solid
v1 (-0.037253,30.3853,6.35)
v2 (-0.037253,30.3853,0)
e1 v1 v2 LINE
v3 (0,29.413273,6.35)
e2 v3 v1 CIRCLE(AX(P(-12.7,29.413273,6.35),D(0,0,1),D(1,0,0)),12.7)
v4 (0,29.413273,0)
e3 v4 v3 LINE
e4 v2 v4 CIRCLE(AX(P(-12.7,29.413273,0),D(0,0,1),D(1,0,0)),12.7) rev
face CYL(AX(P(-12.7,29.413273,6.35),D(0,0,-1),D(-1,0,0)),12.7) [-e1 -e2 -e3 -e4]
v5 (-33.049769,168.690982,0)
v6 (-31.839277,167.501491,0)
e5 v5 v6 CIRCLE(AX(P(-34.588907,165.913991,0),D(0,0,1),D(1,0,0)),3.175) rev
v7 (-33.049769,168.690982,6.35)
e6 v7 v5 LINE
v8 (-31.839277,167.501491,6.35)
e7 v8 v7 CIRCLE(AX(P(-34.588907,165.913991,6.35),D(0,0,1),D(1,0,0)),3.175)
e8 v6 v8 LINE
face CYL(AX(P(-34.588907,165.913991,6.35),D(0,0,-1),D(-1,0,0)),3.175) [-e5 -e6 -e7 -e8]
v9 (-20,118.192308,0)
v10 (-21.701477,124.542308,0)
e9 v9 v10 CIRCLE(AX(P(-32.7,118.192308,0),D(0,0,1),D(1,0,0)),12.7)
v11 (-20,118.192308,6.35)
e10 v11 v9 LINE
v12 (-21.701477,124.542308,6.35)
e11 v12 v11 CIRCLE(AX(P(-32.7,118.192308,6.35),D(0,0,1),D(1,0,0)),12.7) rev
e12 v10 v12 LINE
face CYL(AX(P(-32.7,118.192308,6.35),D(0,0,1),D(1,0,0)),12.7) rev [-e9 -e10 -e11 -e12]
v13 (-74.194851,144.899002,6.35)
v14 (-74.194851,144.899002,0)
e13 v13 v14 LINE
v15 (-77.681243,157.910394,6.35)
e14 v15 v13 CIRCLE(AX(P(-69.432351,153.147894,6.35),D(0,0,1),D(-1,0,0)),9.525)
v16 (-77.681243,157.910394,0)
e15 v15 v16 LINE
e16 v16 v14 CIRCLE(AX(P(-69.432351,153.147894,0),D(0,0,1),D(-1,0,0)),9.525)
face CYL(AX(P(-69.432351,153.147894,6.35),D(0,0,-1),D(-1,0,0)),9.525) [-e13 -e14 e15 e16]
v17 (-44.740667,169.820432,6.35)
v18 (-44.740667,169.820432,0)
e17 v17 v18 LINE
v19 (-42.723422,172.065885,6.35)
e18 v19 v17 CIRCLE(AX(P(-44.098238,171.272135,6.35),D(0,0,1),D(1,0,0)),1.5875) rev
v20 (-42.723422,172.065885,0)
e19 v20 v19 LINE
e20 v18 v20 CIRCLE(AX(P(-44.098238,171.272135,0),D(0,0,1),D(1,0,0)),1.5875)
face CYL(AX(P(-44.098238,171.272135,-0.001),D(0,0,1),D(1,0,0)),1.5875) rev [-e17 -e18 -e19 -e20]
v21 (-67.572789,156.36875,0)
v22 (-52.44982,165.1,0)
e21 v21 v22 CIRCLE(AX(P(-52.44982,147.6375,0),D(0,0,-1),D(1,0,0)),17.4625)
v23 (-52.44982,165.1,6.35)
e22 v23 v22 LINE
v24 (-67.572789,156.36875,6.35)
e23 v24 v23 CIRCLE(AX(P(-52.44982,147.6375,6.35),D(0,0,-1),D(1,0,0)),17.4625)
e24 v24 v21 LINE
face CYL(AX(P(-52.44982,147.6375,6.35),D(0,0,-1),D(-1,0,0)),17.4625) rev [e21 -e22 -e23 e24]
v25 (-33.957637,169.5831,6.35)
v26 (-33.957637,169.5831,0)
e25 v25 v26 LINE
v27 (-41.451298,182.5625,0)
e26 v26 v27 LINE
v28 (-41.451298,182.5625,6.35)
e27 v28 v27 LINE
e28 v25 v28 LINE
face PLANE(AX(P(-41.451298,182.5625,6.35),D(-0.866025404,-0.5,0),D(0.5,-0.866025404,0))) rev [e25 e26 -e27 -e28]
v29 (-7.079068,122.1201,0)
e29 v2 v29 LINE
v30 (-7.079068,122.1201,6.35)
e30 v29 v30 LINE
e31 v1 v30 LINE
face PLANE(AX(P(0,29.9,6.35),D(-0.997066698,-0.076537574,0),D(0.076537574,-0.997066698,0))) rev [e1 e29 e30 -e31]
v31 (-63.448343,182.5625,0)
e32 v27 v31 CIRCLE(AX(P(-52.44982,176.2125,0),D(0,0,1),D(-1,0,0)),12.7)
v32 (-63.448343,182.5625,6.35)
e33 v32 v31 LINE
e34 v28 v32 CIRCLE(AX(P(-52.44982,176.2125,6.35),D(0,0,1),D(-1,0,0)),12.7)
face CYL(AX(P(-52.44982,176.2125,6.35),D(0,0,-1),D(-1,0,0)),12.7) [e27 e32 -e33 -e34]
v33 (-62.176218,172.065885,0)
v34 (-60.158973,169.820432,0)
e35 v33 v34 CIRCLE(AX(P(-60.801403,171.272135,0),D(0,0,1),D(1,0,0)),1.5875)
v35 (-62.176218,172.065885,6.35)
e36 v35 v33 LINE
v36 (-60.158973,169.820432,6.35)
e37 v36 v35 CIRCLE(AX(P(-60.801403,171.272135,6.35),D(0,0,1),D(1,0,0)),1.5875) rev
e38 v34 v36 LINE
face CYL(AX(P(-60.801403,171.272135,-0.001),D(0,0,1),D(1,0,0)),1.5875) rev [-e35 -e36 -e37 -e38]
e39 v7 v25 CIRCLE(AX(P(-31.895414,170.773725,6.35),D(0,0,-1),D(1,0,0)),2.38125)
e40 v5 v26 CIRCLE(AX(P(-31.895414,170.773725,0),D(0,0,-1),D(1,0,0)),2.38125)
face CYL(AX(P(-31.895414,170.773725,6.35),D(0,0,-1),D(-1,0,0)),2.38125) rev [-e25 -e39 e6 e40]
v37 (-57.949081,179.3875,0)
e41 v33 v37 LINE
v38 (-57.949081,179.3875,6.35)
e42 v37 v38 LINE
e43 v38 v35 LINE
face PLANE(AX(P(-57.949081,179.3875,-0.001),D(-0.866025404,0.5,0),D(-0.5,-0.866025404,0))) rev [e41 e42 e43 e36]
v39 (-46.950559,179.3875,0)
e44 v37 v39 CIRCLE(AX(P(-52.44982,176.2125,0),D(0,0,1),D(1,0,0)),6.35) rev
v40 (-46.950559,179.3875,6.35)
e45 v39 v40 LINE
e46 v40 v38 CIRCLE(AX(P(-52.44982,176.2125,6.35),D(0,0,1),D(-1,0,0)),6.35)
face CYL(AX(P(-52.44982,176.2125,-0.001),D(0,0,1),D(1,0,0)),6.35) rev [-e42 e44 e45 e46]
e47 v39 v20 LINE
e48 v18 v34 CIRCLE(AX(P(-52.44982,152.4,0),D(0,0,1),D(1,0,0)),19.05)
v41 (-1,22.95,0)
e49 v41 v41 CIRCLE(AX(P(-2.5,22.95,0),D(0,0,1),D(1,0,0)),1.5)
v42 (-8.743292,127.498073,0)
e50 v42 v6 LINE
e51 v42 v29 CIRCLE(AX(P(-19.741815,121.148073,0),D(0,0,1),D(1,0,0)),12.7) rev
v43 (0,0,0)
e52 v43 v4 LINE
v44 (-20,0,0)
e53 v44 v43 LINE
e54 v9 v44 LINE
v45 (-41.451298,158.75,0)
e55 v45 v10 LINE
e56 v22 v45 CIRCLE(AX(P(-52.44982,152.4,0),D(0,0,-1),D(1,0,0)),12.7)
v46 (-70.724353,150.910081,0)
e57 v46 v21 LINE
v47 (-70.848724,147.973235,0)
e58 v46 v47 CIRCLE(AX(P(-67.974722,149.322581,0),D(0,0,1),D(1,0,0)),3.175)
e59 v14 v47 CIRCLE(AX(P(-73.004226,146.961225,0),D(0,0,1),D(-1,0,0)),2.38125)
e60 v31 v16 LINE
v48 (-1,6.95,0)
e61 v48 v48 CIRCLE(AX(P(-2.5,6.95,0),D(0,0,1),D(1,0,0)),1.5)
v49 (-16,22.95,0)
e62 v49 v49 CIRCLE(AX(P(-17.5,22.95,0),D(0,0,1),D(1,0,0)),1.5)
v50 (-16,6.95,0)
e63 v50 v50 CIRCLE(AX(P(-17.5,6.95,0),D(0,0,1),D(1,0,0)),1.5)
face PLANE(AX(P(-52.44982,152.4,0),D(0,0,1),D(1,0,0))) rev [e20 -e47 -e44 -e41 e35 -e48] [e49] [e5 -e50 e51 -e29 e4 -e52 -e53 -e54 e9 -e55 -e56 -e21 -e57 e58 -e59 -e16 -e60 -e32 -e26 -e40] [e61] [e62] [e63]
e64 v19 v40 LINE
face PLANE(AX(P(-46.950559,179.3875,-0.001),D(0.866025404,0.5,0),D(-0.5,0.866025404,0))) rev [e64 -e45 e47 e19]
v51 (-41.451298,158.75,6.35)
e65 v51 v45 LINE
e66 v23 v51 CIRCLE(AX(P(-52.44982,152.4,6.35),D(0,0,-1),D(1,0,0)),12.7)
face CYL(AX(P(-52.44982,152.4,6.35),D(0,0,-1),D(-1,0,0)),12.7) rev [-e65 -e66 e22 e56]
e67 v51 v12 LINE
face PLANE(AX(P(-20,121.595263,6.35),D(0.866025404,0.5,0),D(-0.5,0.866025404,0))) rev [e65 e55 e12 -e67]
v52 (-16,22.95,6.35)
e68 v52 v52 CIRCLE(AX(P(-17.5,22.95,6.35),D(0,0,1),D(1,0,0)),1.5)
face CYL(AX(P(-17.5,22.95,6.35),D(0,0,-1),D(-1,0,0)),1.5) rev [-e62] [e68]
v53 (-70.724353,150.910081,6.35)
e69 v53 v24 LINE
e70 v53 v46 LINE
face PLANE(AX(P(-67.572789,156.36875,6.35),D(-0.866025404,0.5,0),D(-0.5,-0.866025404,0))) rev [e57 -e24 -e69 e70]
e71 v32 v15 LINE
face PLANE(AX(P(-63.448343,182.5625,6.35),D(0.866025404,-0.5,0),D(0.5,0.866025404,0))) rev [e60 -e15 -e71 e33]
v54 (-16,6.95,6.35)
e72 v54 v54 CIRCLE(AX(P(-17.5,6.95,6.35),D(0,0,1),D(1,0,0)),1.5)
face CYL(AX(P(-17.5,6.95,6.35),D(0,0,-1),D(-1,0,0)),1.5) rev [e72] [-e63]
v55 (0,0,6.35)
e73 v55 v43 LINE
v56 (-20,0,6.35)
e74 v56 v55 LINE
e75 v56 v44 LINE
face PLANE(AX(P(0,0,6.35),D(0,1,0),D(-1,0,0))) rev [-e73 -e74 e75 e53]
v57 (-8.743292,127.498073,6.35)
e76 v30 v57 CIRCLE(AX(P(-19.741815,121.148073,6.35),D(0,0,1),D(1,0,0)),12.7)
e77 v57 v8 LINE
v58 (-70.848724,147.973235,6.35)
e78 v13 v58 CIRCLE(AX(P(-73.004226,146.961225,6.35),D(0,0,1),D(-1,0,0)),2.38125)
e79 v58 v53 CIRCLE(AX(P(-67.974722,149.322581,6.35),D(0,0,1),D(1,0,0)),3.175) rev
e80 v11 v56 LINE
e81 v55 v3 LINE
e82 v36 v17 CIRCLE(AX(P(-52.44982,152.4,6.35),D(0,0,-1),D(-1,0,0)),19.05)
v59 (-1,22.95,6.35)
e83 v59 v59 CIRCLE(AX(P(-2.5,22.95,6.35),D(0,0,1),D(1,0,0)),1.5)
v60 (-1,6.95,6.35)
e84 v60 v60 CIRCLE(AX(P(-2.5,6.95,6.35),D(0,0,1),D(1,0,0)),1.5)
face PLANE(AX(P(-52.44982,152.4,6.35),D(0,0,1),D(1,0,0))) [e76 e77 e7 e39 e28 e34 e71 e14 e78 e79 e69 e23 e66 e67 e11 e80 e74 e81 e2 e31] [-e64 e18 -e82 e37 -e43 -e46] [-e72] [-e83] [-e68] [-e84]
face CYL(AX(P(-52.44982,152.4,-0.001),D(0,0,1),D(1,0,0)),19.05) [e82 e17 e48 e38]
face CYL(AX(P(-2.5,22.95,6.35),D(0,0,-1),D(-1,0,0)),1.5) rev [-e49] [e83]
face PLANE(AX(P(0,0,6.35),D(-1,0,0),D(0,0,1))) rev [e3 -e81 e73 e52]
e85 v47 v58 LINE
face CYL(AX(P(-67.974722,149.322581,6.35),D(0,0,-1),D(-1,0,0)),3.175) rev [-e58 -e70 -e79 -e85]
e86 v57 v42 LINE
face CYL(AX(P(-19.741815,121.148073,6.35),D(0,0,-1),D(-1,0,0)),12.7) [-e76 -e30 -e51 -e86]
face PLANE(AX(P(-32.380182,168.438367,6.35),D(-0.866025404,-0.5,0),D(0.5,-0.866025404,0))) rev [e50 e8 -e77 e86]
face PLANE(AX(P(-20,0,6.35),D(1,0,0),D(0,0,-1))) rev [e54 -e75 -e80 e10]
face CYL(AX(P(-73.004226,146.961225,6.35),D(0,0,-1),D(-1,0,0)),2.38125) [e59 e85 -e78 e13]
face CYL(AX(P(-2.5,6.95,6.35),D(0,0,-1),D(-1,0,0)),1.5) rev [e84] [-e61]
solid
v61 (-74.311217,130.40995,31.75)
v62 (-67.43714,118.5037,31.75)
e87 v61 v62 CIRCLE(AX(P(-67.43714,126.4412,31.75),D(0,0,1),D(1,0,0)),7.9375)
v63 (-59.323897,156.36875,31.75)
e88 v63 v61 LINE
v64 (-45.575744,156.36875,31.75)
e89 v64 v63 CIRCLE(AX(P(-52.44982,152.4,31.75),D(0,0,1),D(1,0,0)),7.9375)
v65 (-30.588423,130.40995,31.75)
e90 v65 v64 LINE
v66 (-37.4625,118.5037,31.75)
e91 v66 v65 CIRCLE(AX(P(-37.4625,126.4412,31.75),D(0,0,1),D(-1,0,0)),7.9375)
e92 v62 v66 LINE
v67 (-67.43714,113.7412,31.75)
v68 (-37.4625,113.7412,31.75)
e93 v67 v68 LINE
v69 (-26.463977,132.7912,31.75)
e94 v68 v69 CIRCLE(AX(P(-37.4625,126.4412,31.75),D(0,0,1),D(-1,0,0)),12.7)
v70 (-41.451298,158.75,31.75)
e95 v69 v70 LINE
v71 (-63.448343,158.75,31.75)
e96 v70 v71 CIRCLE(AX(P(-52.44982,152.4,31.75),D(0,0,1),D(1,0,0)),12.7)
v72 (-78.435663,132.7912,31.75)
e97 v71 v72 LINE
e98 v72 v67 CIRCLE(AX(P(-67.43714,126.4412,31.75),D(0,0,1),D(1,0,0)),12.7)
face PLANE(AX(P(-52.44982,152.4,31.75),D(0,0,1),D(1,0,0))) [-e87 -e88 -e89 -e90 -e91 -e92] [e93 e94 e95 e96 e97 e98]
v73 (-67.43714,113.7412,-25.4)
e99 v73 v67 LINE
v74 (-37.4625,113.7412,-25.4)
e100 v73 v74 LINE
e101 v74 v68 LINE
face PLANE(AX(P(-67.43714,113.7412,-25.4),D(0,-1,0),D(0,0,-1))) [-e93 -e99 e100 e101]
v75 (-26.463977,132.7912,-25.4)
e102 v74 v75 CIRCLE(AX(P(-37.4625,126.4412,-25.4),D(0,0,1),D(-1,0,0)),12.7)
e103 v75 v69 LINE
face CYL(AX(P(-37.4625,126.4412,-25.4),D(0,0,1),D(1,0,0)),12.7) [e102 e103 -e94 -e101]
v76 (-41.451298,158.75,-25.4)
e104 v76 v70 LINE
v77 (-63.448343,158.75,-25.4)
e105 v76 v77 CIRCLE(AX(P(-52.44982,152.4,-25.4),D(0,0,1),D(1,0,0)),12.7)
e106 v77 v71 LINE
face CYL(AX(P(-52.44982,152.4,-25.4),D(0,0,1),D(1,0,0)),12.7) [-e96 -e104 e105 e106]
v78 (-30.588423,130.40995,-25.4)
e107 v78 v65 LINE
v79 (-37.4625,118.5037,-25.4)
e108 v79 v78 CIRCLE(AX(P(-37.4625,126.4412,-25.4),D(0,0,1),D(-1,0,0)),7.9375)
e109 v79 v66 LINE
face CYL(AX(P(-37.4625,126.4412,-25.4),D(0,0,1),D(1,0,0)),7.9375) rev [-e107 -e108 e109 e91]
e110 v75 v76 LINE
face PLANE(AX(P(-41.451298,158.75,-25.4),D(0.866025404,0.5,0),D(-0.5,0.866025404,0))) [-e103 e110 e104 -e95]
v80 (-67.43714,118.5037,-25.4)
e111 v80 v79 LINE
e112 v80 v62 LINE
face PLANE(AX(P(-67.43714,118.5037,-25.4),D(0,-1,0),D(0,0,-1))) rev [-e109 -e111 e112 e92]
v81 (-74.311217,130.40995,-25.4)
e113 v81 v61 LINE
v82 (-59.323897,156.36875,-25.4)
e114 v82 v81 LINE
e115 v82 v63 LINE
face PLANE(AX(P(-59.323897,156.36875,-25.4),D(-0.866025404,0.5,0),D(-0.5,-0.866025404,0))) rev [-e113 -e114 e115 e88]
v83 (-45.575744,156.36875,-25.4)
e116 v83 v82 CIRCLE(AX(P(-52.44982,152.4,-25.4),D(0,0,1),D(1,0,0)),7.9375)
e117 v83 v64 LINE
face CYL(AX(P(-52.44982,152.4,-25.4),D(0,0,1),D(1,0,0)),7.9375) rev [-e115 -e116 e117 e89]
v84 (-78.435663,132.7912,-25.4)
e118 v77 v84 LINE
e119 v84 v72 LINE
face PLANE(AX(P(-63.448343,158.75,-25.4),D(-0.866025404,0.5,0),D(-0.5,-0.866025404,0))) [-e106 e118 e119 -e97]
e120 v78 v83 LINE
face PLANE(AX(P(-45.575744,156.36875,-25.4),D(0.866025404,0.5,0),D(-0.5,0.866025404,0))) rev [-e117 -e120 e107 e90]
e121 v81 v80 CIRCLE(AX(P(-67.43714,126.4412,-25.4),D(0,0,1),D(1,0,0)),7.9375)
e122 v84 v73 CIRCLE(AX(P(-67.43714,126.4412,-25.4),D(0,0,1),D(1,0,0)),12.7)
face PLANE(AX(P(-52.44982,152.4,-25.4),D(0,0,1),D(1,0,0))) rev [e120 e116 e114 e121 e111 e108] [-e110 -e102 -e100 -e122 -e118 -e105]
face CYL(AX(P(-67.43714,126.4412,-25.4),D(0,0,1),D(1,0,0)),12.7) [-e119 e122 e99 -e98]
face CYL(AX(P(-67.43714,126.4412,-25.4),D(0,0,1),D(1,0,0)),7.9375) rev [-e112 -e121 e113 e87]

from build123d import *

# Parameters (mm, degrees)
SKETCH1_R                = 1.5
BOSS_EXTRUDE1_DEPTH      = 6.35
FILLET1_R                = 3.175
FILLET2_R                = 12.7
CUT_EXTRUDE1_REACH       = 206.848
FILLET3_R                = 1.5875
BOSS_EXTRUDE2_DEPTH      = 25.4
BOSS_EXTRUDE2_DEPTH_BACK = 31.75


with BuildPart() as part:
    # Sketch1 → Boss-Extrude1 (new body)
    with BuildSketch(Plane.XY):
        with BuildLine():
            Line((0, 0), (0, 29.9))
            Line((0, 29.9), (-7.3, 124.998217517))
            Line((-7.3, 124.998217517), (-32.380181769, 168.438366604))
            Line((-32.380181769, 168.438366604), (-32.511727314, 168.473614126))
            ThreePointArc((-32.511727314, 168.473614126), (-33.345027616, 168.884552358), (-33.957637456, 169.5831))
            Line((-33.957637456, 169.5831), (-41.45129754, 182.5625))
            ThreePointArc((-41.45129754, 182.5625), (-52.449820168, 188.9125), (-63.448342796, 182.5625))
            Line((-63.448342796, 182.5625), (-77.681242844, 157.910393978))
            ThreePointArc((-77.681242844, 157.910393978), (-78.632794368, 150.682642574), (-74.194850873, 144.899002007))
            ThreePointArc((-74.194850873, 144.899002007), (-70.94200288, 145.7706), (-71.813600873, 149.023447993))
            Line((-71.813600873, 149.023447993), (-67.572788781, 156.36875))
            ThreePointArc((-67.572788781, 156.36875), (-61.181070168, 162.760468614), (-52.449820168, 165.1))
            ThreePointArc((-52.449820168, 165.1), (-46.099820168, 163.398522628), (-41.45129754, 158.75))
            Line((-41.45129754, 158.75), (-20, 121.595262773))
            Line((-20, 121.595262773), (-20, 0))
            Line((-20, 0), (0, 0))
        make_face()
        with Locations((-2.5, 22.95)):
            Circle(SKETCH1_R, mode=Mode.SUBTRACT)
        with Locations((-2.5, 6.95)):
            Circle(SKETCH1_R, mode=Mode.SUBTRACT)
        with Locations((-17.5, 6.95)):
            Circle(SKETCH1_R, mode=Mode.SUBTRACT)
        with Locations((-17.5, 22.95)):
            Circle(SKETCH1_R, mode=Mode.SUBTRACT)
    extrude(amount=BOSS_EXTRUDE1_DEPTH)

    # Fillet1
    fillet1_edges = [part.edges().sort_by_distance(p)[0] for p in [
        (-32.380181769, 168.438366604, 3.175),
        (-71.813600873, 149.023447993, 3.175),
    ]]
    fillet(fillet1_edges, radius=FILLET1_R)

    # Fillet2
    # the kernel refuses this fillet: 12.7 mm, written as the material it adds along each edge
    with BuildSketch(Plane(origin=(-20, 121.595262773, 0), x_dir=(0, -1, 0), z_dir=(0, 0, 1))) as fillet2_piece_1:
        with BuildLine():
            CenterArc((FILLET2_R * 0.267949192431, -FILLET2_R), FILLET2_R, 90, 30)
            Line((-FILLET2_R * 0.232050807569, -FILLET2_R * 0.133974596216), (0, 0))
            Line((0, 0), (FILLET2_R * 0.267949192431, 0))
        make_face()
    extrude(amount=6.35)
    # the kernel refuses this fillet: 12.7 mm, written as the material it takes off along each edge
    with BuildSketch(Plane(origin=(-7.3, 124.998217517, -7.216461282), x_dir=(-0.5000000000000012, 0.866025403784438, 0), z_dir=(0, 0, 1))) as fillet2_2_piece_1:
        with BuildLine():
            CenterArc((FILLET2_R * 0.227290119104, FILLET2_R), FILLET2_R, 244.389572805, 25.610427195)
            Line((-FILLET2_R * 0.204959746031, FILLET2_R * 0.0982461233291), (0, 0))
            Line((0, 0), (FILLET2_R * 0.227290119104, 0))
        make_face()
    extrude(amount=20.782922563, mode=Mode.SUBTRACT)
    with BuildSketch(Plane(origin=(0, 29.9, -1.216818641), x_dir=(-0.07653757434641197, 0.9970666977254669, 0), z_dir=(0, 0, 1))) as fillet2_2_piece_2:
        with BuildLine():
            CenterArc((FILLET2_R * 0.038324996573, FILLET2_R), FILLET2_R, 265.610427195, 4.389572805)
            Line((-FILLET2_R * 0.0382125777734, FILLET2_R * 0.00293330227453), (0, 0))
            Line((0, 0), (FILLET2_R * 0.038324996573, 0))
        make_face()
    extrude(amount=8.783637282, mode=Mode.SUBTRACT)

    # Sketch2 → Cut-Extrude1 (cut, up to next)
    with BuildSketch(Plane.XY.offset(6.35), mode=Mode.PRIVATE) as cut_extrude1_sk1:
        with BuildLine():
            Line((-57.949081482, 179.3875), (-65.539358526, 166.240754516))
            ThreePointArc((-65.539358526, 166.240754516), (-52.449820168, 171.45), (-39.36028181, 166.240754516))
            Line((-39.36028181, 166.240754516), (-46.950558854, 179.3875))
            ThreePointArc((-46.950558854, 179.3875), (-52.449820168, 182.5625), (-57.949081482, 179.3875))
        make_face()
    cut_extrude1_tool1 = extrude(cut_extrude1_sk1.sketch, amount=-CUT_EXTRUDE1_REACH, mode=Mode.PRIVATE) & part.part
    add(cut_extrude1_tool1.solids().sort_by_distance((-52.44982, 175.064419, 6.35))[0], mode=Mode.SUBTRACT)

    # Fillet3
    fillet3_edges = [part.edges().sort_by_distance(p)[0] for p in [
        (-39.36028181, 166.240754516, 3.175),
        (-65.539358526, 166.240754516, 3.175),
    ]]
    fillet(fillet3_edges, radius=FILLET3_R)


with BuildPart() as body_2:
    # Sketch3 → Boss-Extrude2 (new, two sides: drawn at the far end of the back side and taken through both)
    with BuildSketch(Plane.XY.offset(6.35).offset(-BOSS_EXTRUDE2_DEPTH_BACK)):
        with BuildLine():
            Line((-41.45129754, 158.75), (-26.463977372, 132.7912))
            ThreePointArc((-26.463977372, 132.7912), (-26.463977372, 120.0912), (-37.4625, 113.7412))
            Line((-37.4625, 113.7412), (-67.437140336, 113.7412))
            ThreePointArc((-67.437140336, 113.7412), (-78.435662964, 120.0912), (-78.435662964, 132.7912))
            Line((-78.435662964, 132.7912), (-63.448342796, 158.75))
            ThreePointArc((-63.448342796, 158.75), (-52.449820168, 165.1), (-41.45129754, 158.75))
        make_face()
        with BuildLine():
            Line((-67.437140336, 118.5037), (-37.4625, 118.5037))
            ThreePointArc((-37.4625, 118.5037), (-30.588423357, 122.47245), (-30.588423357, 130.40995))
            Line((-30.588423357, 130.40995), (-45.575743525, 156.36875))
            ThreePointArc((-45.575743525, 156.36875), (-52.449820168, 160.3375), (-59.32389681, 156.36875))
            Line((-59.32389681, 156.36875), (-74.311216978, 130.40995))
            ThreePointArc((-74.311216978, 130.40995), (-74.311216978, 122.47245), (-67.437140336, 118.5037))
        make_face(mode=Mode.SUBTRACT)
    extrude(amount=BOSS_EXTRUDE2_DEPTH + BOSS_EXTRUDE2_DEPTH_BACK)


solid = Compound([part.part, body_2.part])
